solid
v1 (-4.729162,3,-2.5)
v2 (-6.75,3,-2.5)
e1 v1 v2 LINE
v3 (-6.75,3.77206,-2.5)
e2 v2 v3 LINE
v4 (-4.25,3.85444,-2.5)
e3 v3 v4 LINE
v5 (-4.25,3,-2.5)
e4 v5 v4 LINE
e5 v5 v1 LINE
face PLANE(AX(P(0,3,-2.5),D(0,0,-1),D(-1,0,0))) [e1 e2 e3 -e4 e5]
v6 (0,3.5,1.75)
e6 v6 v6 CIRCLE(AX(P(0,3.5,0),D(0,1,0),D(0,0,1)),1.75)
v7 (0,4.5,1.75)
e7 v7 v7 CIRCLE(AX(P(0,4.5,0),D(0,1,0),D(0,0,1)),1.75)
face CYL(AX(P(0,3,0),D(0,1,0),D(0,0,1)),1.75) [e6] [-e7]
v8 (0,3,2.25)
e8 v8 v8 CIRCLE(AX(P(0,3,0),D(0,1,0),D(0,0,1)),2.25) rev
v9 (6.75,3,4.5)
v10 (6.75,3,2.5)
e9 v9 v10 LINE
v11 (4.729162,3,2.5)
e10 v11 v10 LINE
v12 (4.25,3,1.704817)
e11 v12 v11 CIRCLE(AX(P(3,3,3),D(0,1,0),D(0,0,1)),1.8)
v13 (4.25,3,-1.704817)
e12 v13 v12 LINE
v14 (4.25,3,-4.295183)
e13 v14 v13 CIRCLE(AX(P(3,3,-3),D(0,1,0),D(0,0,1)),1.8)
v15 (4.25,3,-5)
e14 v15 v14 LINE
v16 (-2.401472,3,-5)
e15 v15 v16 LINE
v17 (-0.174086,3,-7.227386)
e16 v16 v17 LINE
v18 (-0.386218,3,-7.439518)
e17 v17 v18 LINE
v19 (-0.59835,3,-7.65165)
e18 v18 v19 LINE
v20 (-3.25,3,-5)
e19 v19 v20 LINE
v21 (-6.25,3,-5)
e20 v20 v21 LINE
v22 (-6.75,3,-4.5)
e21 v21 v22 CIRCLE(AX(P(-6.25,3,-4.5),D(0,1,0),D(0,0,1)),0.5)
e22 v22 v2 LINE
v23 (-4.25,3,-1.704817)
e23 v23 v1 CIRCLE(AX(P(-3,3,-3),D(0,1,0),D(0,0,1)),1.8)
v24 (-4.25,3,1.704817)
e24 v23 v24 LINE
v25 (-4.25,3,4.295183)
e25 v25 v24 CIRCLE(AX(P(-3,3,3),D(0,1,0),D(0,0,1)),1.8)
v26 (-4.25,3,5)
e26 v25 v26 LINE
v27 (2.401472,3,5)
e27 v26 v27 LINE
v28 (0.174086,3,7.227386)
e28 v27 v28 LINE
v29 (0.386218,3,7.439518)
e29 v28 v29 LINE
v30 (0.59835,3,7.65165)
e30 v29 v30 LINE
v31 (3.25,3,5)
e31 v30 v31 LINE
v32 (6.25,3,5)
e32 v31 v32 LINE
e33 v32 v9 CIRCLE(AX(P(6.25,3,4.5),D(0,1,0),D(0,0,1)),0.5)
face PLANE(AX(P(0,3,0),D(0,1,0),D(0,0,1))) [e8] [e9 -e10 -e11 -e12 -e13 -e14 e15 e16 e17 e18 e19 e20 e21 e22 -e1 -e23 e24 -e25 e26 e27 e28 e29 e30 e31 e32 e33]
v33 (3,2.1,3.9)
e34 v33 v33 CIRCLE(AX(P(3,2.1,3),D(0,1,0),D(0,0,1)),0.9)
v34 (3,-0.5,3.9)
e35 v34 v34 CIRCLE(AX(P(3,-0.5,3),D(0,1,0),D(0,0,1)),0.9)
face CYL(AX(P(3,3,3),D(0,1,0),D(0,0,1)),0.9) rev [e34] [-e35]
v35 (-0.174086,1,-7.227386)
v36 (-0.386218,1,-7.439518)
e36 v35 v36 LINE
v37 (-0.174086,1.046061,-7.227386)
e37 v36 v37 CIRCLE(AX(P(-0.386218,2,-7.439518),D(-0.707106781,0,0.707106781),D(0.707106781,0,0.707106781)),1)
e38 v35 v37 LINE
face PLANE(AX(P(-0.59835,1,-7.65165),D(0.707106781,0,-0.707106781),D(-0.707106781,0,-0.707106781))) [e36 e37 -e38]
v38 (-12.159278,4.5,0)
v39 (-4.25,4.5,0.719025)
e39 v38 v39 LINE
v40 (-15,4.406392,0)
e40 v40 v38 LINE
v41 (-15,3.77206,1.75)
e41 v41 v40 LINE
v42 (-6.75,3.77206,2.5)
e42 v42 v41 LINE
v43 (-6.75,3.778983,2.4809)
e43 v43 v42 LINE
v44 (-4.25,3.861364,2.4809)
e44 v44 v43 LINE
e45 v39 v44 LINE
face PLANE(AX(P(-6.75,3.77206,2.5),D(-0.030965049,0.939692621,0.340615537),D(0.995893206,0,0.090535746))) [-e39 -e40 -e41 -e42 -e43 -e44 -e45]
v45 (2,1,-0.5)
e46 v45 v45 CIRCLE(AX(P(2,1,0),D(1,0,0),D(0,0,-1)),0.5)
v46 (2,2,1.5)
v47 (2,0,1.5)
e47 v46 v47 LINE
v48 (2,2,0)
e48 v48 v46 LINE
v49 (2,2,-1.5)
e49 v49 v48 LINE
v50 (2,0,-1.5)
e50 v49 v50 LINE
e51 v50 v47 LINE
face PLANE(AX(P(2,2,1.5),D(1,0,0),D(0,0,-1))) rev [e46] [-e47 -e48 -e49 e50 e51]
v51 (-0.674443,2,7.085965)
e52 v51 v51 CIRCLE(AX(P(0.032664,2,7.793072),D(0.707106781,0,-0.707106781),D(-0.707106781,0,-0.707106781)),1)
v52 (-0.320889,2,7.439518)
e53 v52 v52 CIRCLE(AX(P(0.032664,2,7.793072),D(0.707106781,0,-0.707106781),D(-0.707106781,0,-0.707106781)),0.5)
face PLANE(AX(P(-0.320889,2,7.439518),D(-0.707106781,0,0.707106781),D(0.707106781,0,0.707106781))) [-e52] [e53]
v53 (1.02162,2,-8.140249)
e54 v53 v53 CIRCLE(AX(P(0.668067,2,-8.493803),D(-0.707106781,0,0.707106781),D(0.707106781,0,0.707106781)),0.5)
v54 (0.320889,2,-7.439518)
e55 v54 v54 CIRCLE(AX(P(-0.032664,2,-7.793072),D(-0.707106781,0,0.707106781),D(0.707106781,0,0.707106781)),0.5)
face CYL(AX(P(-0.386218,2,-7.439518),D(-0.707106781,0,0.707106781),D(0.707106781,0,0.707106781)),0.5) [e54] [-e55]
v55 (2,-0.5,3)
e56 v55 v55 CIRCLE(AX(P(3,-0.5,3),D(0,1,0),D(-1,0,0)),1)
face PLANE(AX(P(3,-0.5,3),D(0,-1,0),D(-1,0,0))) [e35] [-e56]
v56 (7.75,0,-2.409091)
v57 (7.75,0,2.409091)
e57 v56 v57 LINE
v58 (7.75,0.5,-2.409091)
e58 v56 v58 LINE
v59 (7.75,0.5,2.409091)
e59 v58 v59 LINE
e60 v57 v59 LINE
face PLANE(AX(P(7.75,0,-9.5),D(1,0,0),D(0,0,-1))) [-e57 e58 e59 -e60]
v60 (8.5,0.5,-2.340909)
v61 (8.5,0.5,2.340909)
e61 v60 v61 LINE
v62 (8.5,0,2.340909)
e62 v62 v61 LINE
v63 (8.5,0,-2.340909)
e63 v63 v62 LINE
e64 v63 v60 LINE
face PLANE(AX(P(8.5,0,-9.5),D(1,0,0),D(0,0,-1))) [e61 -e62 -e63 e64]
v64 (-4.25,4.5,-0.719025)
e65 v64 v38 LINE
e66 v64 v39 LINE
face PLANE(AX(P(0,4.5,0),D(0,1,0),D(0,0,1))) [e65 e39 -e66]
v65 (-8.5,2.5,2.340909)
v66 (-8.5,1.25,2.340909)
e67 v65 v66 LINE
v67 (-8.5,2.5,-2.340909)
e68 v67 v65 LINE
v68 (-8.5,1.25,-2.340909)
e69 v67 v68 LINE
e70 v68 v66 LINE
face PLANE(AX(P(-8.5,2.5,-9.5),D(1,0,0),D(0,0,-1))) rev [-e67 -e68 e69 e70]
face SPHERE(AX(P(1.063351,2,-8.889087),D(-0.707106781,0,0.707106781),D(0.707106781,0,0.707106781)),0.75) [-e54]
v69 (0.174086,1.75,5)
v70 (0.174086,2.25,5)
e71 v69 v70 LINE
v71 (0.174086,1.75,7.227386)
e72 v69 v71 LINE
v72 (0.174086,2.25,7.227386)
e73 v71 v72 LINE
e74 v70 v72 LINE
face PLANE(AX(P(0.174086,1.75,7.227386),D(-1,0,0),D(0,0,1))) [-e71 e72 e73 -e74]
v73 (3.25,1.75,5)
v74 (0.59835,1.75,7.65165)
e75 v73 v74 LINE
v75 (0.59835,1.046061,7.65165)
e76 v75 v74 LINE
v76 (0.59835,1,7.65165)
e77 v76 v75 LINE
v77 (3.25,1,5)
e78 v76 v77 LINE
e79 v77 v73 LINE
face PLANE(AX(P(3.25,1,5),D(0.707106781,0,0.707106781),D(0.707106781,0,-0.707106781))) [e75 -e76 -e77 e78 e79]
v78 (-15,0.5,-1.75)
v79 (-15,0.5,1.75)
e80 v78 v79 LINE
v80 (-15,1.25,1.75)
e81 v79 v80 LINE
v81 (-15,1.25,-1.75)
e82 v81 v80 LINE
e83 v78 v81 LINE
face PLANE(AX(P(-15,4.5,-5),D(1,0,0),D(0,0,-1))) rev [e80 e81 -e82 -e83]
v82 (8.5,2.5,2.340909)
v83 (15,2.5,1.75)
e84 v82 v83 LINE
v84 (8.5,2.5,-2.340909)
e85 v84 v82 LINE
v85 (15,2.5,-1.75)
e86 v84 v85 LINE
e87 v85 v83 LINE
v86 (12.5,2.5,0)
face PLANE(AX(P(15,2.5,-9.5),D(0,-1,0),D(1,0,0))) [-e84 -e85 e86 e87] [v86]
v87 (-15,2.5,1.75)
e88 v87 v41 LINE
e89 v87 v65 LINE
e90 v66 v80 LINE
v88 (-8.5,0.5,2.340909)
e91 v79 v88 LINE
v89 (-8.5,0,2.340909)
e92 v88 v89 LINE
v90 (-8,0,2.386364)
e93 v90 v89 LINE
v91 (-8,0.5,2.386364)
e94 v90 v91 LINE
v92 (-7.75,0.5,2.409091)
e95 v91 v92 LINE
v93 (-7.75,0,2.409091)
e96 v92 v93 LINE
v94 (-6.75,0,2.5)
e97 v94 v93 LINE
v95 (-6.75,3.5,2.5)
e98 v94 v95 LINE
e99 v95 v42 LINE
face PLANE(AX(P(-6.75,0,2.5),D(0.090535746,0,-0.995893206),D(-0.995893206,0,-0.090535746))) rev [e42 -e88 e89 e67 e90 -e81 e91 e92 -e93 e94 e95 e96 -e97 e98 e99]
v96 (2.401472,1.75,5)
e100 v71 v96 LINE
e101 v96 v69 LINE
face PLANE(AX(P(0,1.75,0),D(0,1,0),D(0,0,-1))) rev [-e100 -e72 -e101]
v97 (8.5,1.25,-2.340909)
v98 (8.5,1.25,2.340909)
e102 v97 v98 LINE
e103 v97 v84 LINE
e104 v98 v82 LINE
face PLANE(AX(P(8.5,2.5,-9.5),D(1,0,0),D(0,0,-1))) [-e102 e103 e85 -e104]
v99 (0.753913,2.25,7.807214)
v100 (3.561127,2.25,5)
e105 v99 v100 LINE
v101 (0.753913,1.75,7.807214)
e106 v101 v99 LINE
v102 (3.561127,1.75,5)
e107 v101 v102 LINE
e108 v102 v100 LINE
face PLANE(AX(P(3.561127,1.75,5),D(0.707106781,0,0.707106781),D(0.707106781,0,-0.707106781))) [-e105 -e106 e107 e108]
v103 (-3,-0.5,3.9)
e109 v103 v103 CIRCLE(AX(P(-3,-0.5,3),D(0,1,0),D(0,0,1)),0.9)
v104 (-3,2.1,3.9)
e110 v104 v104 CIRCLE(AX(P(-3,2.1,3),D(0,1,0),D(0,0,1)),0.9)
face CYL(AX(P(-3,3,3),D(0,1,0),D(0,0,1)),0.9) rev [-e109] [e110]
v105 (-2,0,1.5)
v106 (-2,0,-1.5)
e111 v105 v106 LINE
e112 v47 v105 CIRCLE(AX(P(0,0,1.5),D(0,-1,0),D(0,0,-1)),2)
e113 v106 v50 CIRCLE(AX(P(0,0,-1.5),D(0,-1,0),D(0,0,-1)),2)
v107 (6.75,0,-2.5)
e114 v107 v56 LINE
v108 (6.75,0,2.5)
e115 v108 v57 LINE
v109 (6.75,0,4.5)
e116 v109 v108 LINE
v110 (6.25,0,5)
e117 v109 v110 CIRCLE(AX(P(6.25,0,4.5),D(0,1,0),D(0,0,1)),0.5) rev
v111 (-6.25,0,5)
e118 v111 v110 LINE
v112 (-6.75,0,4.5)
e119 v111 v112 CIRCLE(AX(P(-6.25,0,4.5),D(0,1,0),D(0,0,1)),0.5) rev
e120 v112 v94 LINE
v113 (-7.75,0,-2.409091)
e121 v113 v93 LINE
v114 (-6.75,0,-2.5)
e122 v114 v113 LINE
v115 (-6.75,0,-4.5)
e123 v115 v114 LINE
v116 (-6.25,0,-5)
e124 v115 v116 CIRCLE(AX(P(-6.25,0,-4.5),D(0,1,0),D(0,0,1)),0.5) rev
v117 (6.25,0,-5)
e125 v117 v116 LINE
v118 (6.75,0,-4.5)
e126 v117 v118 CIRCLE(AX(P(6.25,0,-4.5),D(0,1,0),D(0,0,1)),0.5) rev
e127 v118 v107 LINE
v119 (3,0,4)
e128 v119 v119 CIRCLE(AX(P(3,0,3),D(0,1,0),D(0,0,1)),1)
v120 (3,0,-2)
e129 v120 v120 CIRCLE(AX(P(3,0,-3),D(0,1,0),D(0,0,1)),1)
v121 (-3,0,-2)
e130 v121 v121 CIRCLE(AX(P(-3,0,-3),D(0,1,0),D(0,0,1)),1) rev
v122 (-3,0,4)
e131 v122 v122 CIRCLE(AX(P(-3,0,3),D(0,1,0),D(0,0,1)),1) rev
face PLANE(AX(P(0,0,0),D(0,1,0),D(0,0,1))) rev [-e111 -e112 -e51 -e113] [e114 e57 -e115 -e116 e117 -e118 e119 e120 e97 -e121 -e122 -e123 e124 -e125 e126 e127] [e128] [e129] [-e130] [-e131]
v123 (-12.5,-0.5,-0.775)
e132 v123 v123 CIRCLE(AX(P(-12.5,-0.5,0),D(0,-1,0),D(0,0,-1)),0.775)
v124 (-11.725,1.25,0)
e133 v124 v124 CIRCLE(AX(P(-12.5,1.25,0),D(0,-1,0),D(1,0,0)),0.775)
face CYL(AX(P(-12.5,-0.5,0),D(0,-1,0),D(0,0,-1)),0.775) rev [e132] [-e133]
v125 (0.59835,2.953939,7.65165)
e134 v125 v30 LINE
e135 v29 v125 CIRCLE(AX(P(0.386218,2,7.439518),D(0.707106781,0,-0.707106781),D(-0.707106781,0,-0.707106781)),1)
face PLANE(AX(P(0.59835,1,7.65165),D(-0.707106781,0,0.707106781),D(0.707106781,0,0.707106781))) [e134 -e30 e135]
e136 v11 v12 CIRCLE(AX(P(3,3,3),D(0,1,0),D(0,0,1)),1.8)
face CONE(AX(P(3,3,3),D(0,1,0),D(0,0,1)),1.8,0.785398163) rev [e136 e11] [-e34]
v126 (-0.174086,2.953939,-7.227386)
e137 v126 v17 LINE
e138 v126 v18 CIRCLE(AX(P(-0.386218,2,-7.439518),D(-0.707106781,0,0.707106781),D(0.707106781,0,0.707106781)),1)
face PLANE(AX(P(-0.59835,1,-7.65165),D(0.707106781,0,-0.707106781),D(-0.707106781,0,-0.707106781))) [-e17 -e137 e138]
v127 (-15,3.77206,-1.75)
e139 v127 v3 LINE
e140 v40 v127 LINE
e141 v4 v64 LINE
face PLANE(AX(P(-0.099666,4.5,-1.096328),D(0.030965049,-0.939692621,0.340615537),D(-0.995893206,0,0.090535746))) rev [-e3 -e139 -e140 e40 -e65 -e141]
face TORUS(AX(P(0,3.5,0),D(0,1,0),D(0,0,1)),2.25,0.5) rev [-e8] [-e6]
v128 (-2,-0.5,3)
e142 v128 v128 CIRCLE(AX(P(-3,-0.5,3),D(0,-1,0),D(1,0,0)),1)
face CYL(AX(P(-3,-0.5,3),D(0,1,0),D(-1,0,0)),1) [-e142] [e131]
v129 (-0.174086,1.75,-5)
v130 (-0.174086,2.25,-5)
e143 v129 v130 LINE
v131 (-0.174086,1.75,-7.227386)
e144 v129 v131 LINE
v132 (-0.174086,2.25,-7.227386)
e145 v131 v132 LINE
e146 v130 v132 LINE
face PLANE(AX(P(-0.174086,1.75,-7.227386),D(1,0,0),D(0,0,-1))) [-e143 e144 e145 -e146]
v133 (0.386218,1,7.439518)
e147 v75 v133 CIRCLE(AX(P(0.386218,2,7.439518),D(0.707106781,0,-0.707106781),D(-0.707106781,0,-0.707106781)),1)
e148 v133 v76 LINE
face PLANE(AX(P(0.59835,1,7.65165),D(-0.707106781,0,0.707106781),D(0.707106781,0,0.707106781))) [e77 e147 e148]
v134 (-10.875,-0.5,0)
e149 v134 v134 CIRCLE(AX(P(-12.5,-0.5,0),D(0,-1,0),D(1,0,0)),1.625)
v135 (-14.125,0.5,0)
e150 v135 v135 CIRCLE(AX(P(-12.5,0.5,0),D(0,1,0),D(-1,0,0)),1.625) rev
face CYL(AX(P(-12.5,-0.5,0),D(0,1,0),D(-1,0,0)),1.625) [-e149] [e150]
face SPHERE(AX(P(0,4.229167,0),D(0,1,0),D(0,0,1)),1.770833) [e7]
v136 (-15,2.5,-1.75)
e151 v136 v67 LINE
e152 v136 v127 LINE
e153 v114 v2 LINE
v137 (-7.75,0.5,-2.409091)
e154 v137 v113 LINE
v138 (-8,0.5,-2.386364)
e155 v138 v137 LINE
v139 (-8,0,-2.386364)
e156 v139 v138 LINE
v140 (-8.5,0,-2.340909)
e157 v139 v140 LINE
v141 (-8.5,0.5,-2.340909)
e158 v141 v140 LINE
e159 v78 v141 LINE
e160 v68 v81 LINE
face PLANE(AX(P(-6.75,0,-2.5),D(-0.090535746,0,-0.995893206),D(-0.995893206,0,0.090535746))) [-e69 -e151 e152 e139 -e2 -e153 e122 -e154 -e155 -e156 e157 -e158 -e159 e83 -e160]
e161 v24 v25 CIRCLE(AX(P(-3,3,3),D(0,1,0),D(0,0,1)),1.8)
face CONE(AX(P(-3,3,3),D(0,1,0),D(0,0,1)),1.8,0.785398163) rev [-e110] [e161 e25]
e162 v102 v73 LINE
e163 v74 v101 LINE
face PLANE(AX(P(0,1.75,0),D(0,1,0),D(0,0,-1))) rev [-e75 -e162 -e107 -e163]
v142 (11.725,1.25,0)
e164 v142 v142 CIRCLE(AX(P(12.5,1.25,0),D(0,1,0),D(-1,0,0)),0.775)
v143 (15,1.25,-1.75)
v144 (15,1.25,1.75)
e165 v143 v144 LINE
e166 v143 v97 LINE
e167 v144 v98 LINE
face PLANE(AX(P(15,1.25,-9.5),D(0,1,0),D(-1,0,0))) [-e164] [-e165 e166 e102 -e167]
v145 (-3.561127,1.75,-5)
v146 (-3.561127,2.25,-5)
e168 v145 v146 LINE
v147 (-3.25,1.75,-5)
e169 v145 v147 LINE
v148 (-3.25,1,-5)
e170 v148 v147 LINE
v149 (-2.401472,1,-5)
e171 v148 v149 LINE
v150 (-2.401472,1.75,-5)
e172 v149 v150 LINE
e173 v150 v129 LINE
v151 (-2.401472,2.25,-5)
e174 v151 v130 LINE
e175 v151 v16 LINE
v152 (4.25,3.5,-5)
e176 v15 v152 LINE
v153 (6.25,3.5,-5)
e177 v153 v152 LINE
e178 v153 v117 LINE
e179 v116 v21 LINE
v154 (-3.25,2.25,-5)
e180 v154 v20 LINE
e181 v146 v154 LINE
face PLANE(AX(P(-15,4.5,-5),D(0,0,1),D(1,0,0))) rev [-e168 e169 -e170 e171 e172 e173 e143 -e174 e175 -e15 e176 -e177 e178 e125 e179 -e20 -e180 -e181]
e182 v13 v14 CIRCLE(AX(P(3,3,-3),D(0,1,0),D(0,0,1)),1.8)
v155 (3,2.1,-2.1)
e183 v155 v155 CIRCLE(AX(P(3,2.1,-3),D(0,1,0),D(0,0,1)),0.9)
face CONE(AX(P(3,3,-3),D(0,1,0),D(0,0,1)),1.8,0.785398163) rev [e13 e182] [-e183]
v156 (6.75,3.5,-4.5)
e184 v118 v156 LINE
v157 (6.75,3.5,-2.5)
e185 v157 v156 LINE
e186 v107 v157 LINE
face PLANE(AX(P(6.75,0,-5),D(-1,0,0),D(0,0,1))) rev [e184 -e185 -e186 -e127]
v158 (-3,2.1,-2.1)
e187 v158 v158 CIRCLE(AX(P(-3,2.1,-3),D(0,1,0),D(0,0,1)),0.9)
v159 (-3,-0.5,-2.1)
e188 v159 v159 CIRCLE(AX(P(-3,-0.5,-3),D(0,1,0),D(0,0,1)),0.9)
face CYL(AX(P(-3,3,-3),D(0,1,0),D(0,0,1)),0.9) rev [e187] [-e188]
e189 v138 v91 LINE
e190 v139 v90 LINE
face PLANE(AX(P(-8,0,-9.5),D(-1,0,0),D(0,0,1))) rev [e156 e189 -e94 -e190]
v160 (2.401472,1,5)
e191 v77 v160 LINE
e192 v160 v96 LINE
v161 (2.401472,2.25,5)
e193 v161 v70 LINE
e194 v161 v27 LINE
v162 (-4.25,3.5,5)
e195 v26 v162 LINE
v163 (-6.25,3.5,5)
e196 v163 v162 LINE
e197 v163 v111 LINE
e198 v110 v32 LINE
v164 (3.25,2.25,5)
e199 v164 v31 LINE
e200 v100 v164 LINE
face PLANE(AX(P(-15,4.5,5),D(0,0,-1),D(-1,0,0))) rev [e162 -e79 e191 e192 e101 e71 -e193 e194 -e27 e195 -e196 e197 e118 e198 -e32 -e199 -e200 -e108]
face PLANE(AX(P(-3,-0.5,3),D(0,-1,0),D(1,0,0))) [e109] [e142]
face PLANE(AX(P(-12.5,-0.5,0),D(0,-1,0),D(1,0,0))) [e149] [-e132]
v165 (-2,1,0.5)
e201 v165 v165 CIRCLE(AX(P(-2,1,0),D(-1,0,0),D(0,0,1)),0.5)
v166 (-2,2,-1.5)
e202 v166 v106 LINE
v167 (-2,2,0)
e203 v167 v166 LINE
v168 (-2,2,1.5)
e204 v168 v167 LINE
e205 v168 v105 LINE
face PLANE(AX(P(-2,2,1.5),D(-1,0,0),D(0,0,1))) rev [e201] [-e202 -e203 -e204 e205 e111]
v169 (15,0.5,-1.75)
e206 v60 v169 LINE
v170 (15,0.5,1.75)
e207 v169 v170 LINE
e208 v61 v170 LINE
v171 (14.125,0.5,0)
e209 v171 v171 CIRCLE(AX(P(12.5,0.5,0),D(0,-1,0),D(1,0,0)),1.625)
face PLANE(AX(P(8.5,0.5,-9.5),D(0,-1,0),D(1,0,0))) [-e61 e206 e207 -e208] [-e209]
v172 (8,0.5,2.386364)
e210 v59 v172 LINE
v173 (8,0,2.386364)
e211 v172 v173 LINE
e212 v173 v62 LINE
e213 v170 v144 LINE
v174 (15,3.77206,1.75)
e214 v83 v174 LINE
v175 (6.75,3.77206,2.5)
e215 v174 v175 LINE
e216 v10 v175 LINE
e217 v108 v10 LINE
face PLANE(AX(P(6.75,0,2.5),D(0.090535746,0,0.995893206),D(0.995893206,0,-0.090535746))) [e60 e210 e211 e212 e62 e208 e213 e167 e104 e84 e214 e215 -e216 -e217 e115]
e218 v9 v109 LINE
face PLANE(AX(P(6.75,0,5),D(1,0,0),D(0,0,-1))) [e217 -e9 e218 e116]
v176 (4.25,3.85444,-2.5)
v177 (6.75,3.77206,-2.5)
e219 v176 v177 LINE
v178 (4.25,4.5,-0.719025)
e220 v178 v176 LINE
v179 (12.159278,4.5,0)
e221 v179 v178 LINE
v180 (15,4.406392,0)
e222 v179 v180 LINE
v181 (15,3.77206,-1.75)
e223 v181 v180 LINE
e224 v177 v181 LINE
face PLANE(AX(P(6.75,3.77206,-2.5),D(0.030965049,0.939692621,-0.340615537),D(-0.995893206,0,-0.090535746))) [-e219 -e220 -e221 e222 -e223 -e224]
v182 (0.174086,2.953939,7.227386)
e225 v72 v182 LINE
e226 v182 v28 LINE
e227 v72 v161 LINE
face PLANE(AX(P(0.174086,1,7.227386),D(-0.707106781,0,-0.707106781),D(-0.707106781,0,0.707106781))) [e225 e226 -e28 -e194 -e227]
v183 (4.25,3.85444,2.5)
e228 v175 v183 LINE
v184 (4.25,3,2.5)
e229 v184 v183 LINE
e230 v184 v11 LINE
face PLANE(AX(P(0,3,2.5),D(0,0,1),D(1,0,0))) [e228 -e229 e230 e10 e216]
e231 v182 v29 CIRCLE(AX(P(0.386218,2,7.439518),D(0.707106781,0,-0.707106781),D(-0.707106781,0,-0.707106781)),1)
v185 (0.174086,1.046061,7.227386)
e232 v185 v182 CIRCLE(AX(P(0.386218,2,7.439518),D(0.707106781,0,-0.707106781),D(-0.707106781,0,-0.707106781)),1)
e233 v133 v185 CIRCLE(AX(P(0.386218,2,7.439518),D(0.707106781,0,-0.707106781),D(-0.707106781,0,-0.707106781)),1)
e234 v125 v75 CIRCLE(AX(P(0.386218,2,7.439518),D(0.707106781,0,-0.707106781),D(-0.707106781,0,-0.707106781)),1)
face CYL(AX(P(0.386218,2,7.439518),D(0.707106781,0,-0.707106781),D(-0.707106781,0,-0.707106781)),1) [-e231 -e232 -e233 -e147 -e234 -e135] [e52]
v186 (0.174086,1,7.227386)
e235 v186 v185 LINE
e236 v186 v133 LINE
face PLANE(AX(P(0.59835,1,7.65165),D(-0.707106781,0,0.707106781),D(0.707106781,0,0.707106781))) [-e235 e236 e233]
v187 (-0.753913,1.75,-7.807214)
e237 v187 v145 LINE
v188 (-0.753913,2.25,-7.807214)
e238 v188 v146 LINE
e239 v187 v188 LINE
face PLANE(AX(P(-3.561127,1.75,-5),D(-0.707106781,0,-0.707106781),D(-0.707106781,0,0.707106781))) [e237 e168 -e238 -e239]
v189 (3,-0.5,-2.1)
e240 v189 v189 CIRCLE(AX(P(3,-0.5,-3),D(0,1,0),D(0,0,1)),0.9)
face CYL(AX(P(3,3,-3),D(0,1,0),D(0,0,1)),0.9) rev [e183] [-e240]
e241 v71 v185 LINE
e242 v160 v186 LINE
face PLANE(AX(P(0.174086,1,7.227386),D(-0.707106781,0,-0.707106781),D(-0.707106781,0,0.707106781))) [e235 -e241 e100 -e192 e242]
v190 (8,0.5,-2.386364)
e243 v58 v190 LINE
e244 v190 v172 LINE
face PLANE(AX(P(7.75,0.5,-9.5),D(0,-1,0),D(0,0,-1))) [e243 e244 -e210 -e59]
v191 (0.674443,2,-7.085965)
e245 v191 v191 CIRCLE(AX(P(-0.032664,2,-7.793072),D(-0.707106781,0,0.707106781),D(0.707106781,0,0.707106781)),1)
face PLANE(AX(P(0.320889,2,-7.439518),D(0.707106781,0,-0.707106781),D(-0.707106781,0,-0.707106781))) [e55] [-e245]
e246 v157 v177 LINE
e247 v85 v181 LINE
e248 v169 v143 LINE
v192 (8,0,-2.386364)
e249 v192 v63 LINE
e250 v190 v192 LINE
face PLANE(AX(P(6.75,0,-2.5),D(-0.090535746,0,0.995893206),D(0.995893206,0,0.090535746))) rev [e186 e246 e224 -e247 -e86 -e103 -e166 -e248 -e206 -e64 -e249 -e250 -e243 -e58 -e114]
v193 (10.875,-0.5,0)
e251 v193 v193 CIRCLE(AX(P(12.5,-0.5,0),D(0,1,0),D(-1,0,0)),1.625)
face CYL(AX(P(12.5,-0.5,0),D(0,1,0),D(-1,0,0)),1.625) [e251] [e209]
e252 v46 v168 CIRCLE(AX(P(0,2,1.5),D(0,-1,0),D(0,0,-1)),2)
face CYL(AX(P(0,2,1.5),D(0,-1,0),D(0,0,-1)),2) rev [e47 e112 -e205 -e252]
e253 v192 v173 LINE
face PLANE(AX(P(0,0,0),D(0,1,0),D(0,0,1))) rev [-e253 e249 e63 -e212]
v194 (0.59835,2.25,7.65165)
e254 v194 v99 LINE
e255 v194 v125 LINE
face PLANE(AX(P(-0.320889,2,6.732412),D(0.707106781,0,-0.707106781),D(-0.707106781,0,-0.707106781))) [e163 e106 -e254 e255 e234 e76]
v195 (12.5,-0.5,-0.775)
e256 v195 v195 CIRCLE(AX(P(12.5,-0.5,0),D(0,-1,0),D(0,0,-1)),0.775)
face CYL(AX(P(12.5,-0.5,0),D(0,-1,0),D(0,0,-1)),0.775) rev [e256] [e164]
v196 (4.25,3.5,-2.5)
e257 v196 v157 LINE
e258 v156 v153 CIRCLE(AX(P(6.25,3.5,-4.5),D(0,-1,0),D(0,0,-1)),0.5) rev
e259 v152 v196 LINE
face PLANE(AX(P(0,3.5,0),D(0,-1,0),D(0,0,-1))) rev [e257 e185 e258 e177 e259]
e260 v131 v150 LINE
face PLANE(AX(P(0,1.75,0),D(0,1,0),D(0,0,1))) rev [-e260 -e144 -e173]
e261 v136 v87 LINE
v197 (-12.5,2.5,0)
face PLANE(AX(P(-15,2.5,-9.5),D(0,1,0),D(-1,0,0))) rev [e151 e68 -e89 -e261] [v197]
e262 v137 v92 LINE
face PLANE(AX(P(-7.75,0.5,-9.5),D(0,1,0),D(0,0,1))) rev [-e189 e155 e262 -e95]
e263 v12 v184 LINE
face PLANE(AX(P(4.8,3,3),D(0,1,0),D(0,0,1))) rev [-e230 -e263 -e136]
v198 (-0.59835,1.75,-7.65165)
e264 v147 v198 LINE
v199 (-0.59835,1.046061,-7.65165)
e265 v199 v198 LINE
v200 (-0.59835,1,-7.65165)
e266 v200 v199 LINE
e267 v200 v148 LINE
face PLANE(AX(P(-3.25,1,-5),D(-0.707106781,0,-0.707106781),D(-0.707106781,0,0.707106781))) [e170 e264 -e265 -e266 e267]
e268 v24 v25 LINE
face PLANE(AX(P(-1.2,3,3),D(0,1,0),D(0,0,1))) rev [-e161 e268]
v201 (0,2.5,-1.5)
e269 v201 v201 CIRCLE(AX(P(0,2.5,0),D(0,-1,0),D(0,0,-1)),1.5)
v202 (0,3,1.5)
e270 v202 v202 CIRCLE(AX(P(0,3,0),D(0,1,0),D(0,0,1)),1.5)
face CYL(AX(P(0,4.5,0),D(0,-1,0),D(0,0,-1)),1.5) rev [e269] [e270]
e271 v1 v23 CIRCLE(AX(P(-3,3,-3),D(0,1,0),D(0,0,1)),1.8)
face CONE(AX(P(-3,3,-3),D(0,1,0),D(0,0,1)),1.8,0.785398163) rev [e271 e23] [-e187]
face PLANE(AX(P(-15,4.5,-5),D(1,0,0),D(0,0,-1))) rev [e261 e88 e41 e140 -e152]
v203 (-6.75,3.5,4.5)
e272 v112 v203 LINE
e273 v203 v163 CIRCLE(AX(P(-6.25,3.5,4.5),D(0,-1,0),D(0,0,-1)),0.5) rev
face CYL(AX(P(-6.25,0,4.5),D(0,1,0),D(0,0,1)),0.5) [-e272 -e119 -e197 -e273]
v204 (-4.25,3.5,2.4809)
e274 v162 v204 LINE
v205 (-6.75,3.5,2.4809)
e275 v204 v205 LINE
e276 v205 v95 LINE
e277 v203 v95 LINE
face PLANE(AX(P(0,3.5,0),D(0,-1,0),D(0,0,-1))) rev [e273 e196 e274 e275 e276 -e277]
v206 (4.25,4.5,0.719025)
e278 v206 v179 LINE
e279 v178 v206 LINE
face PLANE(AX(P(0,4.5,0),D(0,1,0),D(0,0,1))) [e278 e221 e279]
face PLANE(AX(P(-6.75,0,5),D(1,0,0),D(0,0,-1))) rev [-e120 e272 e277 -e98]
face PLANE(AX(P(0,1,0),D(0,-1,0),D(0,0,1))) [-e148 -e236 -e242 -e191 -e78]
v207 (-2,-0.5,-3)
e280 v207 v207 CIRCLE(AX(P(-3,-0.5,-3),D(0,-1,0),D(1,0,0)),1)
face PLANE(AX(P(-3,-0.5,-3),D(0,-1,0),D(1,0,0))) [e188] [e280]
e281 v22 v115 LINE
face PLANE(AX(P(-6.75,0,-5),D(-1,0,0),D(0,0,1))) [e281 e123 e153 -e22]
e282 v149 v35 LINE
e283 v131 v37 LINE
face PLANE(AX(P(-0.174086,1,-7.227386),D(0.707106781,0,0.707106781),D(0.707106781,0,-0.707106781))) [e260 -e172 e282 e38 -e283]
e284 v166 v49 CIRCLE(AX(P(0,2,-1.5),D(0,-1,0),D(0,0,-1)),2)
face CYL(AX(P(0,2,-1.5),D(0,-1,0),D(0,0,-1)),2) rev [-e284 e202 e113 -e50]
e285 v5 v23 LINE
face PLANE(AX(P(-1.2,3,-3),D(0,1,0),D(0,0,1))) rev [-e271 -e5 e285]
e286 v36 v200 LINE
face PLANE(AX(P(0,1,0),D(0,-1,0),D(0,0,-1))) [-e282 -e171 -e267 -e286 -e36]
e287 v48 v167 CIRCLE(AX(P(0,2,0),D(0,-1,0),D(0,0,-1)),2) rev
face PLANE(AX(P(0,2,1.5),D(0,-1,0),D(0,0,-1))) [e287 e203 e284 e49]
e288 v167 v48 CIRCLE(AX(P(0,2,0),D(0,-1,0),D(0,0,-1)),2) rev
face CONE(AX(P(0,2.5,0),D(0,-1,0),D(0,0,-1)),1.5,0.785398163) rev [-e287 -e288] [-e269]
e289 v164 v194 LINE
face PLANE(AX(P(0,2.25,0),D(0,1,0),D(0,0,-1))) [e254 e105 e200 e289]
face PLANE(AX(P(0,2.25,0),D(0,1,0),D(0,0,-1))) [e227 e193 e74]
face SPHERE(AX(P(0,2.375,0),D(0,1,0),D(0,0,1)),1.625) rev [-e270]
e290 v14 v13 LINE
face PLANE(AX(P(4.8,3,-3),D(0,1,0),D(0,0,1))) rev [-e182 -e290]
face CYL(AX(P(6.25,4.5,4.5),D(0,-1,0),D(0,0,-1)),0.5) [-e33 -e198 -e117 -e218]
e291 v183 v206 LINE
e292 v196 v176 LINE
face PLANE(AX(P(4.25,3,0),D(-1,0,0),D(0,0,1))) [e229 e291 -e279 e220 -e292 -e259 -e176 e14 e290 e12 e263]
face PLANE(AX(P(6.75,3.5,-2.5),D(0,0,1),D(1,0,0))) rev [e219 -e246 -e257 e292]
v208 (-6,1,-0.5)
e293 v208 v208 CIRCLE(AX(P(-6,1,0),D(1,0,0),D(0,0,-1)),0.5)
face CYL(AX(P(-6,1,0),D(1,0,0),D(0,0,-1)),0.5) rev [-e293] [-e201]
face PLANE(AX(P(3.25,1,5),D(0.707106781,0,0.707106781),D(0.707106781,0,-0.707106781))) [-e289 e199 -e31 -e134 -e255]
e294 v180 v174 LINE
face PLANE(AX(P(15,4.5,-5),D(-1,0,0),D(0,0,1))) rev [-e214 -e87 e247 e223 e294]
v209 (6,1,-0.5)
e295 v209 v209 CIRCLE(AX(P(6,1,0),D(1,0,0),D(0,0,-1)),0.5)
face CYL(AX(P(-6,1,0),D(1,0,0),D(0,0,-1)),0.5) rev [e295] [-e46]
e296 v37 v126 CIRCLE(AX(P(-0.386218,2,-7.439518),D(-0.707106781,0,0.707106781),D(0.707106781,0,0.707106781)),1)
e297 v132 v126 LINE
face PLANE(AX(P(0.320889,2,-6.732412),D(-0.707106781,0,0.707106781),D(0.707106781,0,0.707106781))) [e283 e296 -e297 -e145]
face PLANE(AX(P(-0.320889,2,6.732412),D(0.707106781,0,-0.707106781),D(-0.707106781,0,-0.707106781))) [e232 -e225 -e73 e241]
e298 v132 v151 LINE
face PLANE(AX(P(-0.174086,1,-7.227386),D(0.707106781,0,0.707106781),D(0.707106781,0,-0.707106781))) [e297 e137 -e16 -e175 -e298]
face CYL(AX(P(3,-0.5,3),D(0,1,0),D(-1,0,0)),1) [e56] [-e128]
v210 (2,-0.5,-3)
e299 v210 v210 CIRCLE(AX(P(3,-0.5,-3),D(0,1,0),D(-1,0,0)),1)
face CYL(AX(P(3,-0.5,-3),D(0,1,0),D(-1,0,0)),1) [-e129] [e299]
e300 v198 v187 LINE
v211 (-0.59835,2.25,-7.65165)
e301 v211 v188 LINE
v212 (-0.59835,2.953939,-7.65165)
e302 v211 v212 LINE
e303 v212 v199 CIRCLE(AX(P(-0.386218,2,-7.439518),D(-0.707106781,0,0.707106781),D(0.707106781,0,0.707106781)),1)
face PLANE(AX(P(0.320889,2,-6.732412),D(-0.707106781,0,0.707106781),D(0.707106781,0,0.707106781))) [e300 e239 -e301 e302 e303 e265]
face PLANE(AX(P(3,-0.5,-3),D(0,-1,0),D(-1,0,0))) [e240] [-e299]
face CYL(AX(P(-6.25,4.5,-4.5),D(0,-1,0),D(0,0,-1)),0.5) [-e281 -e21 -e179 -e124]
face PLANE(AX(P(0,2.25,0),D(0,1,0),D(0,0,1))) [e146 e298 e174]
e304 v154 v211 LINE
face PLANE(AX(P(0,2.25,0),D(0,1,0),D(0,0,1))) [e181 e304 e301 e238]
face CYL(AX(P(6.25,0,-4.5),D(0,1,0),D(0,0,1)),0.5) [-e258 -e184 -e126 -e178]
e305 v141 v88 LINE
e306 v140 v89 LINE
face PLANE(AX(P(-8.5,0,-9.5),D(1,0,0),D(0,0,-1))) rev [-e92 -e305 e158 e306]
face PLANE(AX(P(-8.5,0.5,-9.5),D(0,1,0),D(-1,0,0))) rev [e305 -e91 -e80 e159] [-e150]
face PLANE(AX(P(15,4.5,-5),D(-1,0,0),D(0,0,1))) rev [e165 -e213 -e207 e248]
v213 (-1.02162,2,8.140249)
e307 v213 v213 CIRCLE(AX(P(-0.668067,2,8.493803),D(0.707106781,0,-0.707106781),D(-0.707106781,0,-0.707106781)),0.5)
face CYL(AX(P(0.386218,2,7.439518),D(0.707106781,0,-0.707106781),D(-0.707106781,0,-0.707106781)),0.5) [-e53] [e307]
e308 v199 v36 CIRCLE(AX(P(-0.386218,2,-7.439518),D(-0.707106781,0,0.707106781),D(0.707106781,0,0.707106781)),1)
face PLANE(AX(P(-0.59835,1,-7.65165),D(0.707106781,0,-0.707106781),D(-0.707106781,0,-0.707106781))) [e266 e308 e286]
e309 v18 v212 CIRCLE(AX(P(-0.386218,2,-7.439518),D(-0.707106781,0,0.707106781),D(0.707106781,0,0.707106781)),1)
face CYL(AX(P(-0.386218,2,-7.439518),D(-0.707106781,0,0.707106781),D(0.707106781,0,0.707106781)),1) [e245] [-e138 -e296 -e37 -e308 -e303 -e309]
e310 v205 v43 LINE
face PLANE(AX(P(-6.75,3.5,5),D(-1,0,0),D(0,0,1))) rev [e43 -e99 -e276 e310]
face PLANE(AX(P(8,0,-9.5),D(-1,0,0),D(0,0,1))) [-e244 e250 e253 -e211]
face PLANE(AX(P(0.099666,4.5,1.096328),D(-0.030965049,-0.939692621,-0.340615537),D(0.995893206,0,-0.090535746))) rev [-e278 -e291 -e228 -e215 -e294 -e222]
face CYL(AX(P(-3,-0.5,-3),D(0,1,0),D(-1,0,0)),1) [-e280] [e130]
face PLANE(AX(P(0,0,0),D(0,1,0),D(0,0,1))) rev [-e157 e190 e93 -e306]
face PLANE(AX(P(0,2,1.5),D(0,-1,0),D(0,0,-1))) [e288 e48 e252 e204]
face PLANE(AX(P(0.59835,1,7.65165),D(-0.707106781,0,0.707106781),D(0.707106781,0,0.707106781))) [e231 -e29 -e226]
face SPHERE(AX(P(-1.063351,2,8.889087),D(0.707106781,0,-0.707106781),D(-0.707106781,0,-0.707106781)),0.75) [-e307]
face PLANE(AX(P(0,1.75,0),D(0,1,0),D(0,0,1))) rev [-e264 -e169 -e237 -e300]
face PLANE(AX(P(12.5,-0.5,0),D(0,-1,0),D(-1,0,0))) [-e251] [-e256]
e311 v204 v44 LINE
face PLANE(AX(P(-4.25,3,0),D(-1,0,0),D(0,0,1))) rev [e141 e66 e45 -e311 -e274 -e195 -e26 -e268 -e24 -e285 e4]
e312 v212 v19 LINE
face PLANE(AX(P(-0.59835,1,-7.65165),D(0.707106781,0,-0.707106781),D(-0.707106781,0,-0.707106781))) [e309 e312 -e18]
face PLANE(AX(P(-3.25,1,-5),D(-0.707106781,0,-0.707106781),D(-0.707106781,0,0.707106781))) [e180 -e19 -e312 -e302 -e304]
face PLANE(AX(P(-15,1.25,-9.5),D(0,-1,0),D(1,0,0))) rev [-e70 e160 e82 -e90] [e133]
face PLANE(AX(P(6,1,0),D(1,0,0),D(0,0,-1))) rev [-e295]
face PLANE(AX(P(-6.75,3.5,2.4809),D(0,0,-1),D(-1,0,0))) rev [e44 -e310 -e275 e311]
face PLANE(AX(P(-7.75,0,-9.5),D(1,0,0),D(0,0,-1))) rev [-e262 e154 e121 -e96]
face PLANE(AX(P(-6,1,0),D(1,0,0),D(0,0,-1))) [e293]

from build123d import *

# Parameters (mm, degrees)
SKETCH2_W                                    = 30
SKETCH2_H                                    = 10
SKETCH2_R                                    = 1.5
BOSS_EXTRUDE1_DEPTH                          = 4.5
CUT_EXTRUDE1_START                           = -1.5
SKETCH3_W                                    = 2.5
SKETCH3_H                                    = 2.5
SKETCH3_R                                    = 1.75
SKETCH3_R_2                                  = 1.5
CUT_EXTRUDE1_DEPTH                           = 1.5
CUT_EXTRUDE2_DEPTH                           = 17.439282223
SKETCH5_W                                    = 2.5
SKETCH5_H                                    = 2.519100352
SKETCH5_H_2                                  = 2.5
CUT_EXTRUDE3_DEPTH                           = 1
SKETCH6_W                                    = 0.25
SKETCH6_H                                    = 0.5
SKETCH6_W_2                                  = 6.5
SKETCH6_H_2                                  = 1.25
CUT_EXTRUDE4_DEPTH                           = 9.5
SKETCH7_R                                    = 1.625
SKETCH7_R_2                                  = 1
SKETCH7_R_3                                  = 0.5
BOSS_EXTRUDE2_DEPTH                          = 1
CHAMFER1_SIZE                                = 0.727940469
CHAMFER1_SIZE_2                              = 2
CSK_FOR_M1_6_COUNTERSUNK_FLAT_HEAD_S_2_COUNT = 2
CSK_FOR_M1_6_COUNTERSUNK_FLAT_HEAD_S_2_PITCH = 6
BOSS_EXTRUDE3_DEPTH                          = 2
BOSS_EXTRUDE4_START                          = -0.75
BOSS_EXTRUDE4_DEPTH                          = 0.5
SKETCH34_R                                   = 1.75
BOSS_EXTRUDE5_DEPTH                          = 1.5
CIRPATTERN1_COUNT                            = 2
CUT_EXTRUDE5_DEPTH                           = 2
SKETCH37_R                                   = 0.5
CUT_EXTRUDE6_DEPTH                           = 6
FILLET1_R                                    = 0.5
CHAMFER2_SIZE                                = 0.5
FILLET2_R                                    = 0.5


# Read off the part's stored shape, not the designer's step: Dome1, Dome3
# Some blends are built 0.0001 mm under size
with BuildPart() as part:
    # Sketch2 → Boss-Extrude1 (new body)
    with BuildSketch(Plane(origin=(0, 0, 0), x_dir=(1, 0, 0), z_dir=(0, 1, 0))):
        Rectangle(SKETCH2_W, SKETCH2_H)
        with Locations(Location((0, 0, 0), (0, 0, 270))):
            Circle(SKETCH2_R, mode=Mode.SUBTRACT)
    extrude(amount=BOSS_EXTRUDE1_DEPTH)

    # Sketch3 → Cut-Extrude1 (cut)
    # profile 1 of 5: a face of its own
    with BuildSketch(Plane(origin=(0, 4.5, 0), x_dir=(1, 0, 0), z_dir=(0, 1, 0)).offset(CUT_EXTRUDE1_START)):
        with Locations((-5.5, 3.75)):
            Rectangle(SKETCH3_W, SKETCH3_H)
    # profile 2 of 5: a face of its own
    with BuildSketch(Plane(origin=(0, 4.5, 0), x_dir=(1, 0, 0), z_dir=(0, 1, 0)).offset(CUT_EXTRUDE1_START)):
        Polygon((4.25, 5), (-4.25, 5), (-4.25, 2.5), (-4.25, -5), (4.25, -5), (4.25, -2.5), align=None)
        with Locations(Location((0, 0, 0), (0, 0, 270))):
            Circle(SKETCH3_R, mode=Mode.SUBTRACT)
    # profile 3 of 5: a face of its own
    with BuildSketch(Plane(origin=(0, 4.5, 0), x_dir=(1, 0, 0), z_dir=(0, 1, 0)).offset(CUT_EXTRUDE1_START)):
        with Locations((5.5, -3.75)):
            Rectangle(SKETCH3_W, SKETCH3_H)
    # profile 4 of 5: a face of its own
    with BuildSketch(Plane(origin=(0, 4.5, 0), x_dir=(1, 0, 0), z_dir=(0, 1, 0)).offset(CUT_EXTRUDE1_START)):
        with Locations(Location((0, 0, 0), (0, 0, 270))):
            Circle(SKETCH3_R_2)
    # profile 5 of 5: a face of its own
    with BuildSketch(Plane(origin=(0, 4.5, 0), x_dir=(1, 0, 0), z_dir=(0, 1, 0)).offset(CUT_EXTRUDE1_START)):
        with Locations(Location((0, 0, 0), (0, 0, 270))):
            Circle(SKETCH3_R_2)
    extrude(amount=CUT_EXTRUDE1_DEPTH, mode=Mode.SUBTRACT)

    # Sketch4 → Cut-Extrude2 (cut, through all)
    with BuildSketch(Plane(origin=(0, 4.5, 0), x_dir=(1, 0, 0), z_dir=(0, 1, 0))):
        Polygon((-6.75, 5), (-6.75, 2.5), (-15, 1.75), (-15, 5), align=None)
        Polygon((6.75, -5), (6.75, -2.5), (15, -1.75), (15, -5), align=None)
        Polygon((15, 5), (6.75, 5), (6.75, 2.5), (15, 1.75), align=None)
        Polygon((-15, -1.75), (-15, -5), (-6.75, -5), (-6.75, -2.5), align=None)
    extrude(amount=-CUT_EXTRUDE2_DEPTH, mode=Mode.SUBTRACT)

    # Sketch5 → Cut-Extrude3 (cut)
    with BuildSketch(Plane(origin=(0, 4.5, 0), x_dir=(1, 0, 0), z_dir=(0, 1, 0))):
        with Locations((-5.5, -3.740449824)):
            Rectangle(SKETCH5_W, SKETCH5_H)
        with Locations((5.5, 3.75)):
            Rectangle(SKETCH5_W, SKETCH5_H_2)
    extrude(amount=-CUT_EXTRUDE3_DEPTH, mode=Mode.SUBTRACT)

    # Sketch6 → Cut-Extrude4 (cut, symmetric)
    with BuildSketch(Plane.XY):
        with Locations((-7.875, 0.25)):
            Rectangle(SKETCH6_W, SKETCH6_H)
        with Locations((-11.75, 0.25)):
            Rectangle(SKETCH6_W_2, SKETCH6_H)
        with Locations((-11.75, 1.875)):
            Rectangle(SKETCH6_W_2, SKETCH6_H_2)
    cut_extrude4 = extrude(amount=CUT_EXTRUDE4_DEPTH, both=True, mode=Mode.SUBTRACT)

    # Sketch7 → Boss-Extrude2 (add)
    # profile 1 of 3: a face of its own
    with BuildSketch(Plane.XZ.offset(-0.5)):
        with Locations(Location((-12.5, 0, 0), (0, 0, 180))):
            Circle(SKETCH7_R)
    # profile 2 of 3: a face of its own
    with BuildSketch(Plane.XZ.offset(-0.5)):
        with Locations(Location((-3, 3, 0), (0, 0, 90))):
            Circle(SKETCH7_R_2)
        with Locations(Location((-3, 3, 0), (0, 0, 90))):
            Circle(SKETCH7_R_3, mode=Mode.SUBTRACT)
    # profile 3 of 3: a face of its own
    with BuildSketch(Plane.XZ.offset(-0.5)):
        with Locations(Location((-3, -3, 0), (0, 0, 90))):
            Circle(SKETCH7_R_2)
        with Locations(Location((-3, -3, 0), (0, 0, 90))):
            Circle(SKETCH7_R_3, mode=Mode.SUBTRACT)
    boss_extrude2 = extrude(amount=BOSS_EXTRUDE2_DEPTH)

    # Chamfer1
    # the kernel refuses this chamfer: 2, 0.727940469 mm, written as the material it takes off along each edge
    with BuildSketch(Plane(origin=(-1.582918179, 4.5, 2.969734711), x_dir=(-0.008966741974113306, -0.9950833631817487, 0.0986341617152475), z_dir=(-0.9958932064677041, 0, -0.09053574604251752))) as chamfer1_piece_1_section:
        Polygon((CHAMFER1_SIZE * 0.995083362543, -CHAMFER1_SIZE * 0.0990409021884), (-CHAMFER1_SIZE_2 * 0.099040902252, -CHAMFER1_SIZE_2 * 0.995083363182), (0, 0), align=None)
    chamfer1_piece_1 = extrude(amount=18.660799693, mode=Mode.PRIVATE)
    chamfer1_piece_1 = split(chamfer1_piece_1, bisect_by=Plane(origin=(-4.25, 4.272837188, 1.854201231), z_dir=(-1, 0, 0)), keep=Keep.TOP, mode=Mode.PRIVATE)
    add(chamfer1_piece_1, mode=Mode.SUBTRACT)
    with BuildSketch(Plane(origin=(-1.582918179, 4.5, -2.969734711), x_dir=(-0.00896674197411342, -0.9950833631817487, -0.09863416171524762), z_dir=(-0.9958932064677039, 0, 0.09053574604251854))) as chamfer1_piece_2_section:
        Polygon((CHAMFER1_SIZE * 0.995083362543, CHAMFER1_SIZE * 0.0990409021884), (-CHAMFER1_SIZE_2 * 0.099040902252, CHAMFER1_SIZE_2 * 0.995083363182), (0, 0), align=None)
    chamfer1_piece_2 = extrude(amount=18.660799693, mode=Mode.PRIVATE)
    chamfer1_piece_2 = split(chamfer1_piece_2, bisect_by=Plane(origin=(-4.25, 4.260155849, -1.543047627), z_dir=(-1, 0, 0)), keep=Keep.TOP, mode=Mode.PRIVATE)
    add(chamfer1_piece_2, mode=Mode.SUBTRACT)
    with BuildSketch(Plane(origin=(1.582918179, 4.5, 2.969734711), x_dir=(0.008966741974113313, -0.9950833631817487, 0.0986341617152475), z_dir=(0.9958932064677041, 0, -0.09053574604251757))) as chamfer1_piece_3_section:
        Polygon((CHAMFER1_SIZE * 0.995083362543, CHAMFER1_SIZE * 0.0990409021884), (-CHAMFER1_SIZE_2 * 0.099040902252, CHAMFER1_SIZE_2 * 0.995083363182), (0, 0), align=None)
    chamfer1_piece_3 = extrude(amount=18.660799693, mode=Mode.PRIVATE)
    chamfer1_piece_3 = split(chamfer1_piece_3, bisect_by=Plane(origin=(4.25, 4.260155849, 1.543047627), z_dir=(1, 0, 0)), keep=Keep.TOP, mode=Mode.PRIVATE)
    add(chamfer1_piece_3, mode=Mode.SUBTRACT)
    with BuildSketch(Plane(origin=(1.582918179, 4.5, -2.969734711), x_dir=(0.00896674197411333, -0.9950833631817487, -0.09863416171524761), z_dir=(0.995893206467704, 0, 0.09053574604251764))) as chamfer1_piece_4_section:
        Polygon((CHAMFER1_SIZE * 0.995083362543, -CHAMFER1_SIZE * 0.0990409021884), (-CHAMFER1_SIZE_2 * 0.099040902252, -CHAMFER1_SIZE_2 * 0.995083363182), (0, 0), align=None)
    chamfer1_piece_4 = extrude(amount=18.660799693, mode=Mode.PRIVATE)
    chamfer1_piece_4 = split(chamfer1_piece_4, bisect_by=Plane(origin=(4.25, 4.260155849, -1.543047627), z_dir=(1, 0, 0)), keep=Keep.TOP, mode=Mode.PRIVATE)
    add(chamfer1_piece_4, mode=Mode.SUBTRACT)

    # Sketch9 → Ø1.55 (1.55) Diameter Hole2 (revolve, cut)
    with BuildSketch(Plane(origin=(-12.5, -0.5, 0), x_dir=(0, 0, -1), z_dir=(1, 0, 0))):
        Polygon((0, 0), (0, 3), (0.775, 2.53433302), (0.775, 0), align=None)
    f_1_55_1_55_diameter_hole2 = revolve(axis=Axis((-12.5, -6.85, 0), (0, 1, 0)), mode=Mode.SUBTRACT)

    # Sketch30 → CSK for M1.6 Countersunk Flat Head Screw9 (revolve, cut)
    with BuildSketch(Plane(origin=(-3, 3, 3), x_dir=(0, 0, 1), z_dir=(1, 0, 0))):
        Polygon((0, 0), (0, 3.5), (0.9, 3.5), (0.9, 0.9), (1.8, 0), align=None)
    csk_for_m1_6_countersunk_flat_head_screw = revolve(axis=Axis((-3, 9.35, 3), (0, -1, 0)), mode=Mode.SUBTRACT)

    # CSK for M1.6 Countersunk Flat Head S 2: CSK for M1.6 Countersunk Flat Head Screw9 ×2
    with Locations(*[(0, 0, -i * CSK_FOR_M1_6_COUNTERSUNK_FLAT_HEAD_S_2_PITCH) for i in range(1, CSK_FOR_M1_6_COUNTERSUNK_FLAT_HEAD_S_2_COUNT)]):
        add(csk_for_m1_6_countersunk_flat_head_screw, mode=Mode.SUBTRACT)

    # Sketch31 → Boss-Extrude3 (add)
    with BuildSketch(Plane(origin=(0, 3, 0), x_dir=(1, 0, 0), z_dir=(0, 1, 0))):
        Polygon((-3.25, 5), (-0.598349571, 7.651650429), (-0.174085502, 7.227386361), (-2.401471863, 5), align=None)
    boss_extrude3 = extrude(amount=-BOSS_EXTRUDE3_DEPTH)

    # Sketch32 → Boss-Extrude4 (add)
    with BuildSketch(Plane(origin=(0, 3, 0), x_dir=(1, 0, 0), z_dir=(0, 1, 0)).offset(BOSS_EXTRUDE4_START)):
        Polygon((-0.174085502, 7.227386361), (-0.174085502, 5), (-3.561126984, 5), (-0.753913062, 7.807213921), align=None)
    boss_extrude4 = extrude(amount=-BOSS_EXTRUDE4_DEPTH)

    # Sketch33 → Revolve1 (revolve)
    with BuildSketch(Plane(origin=(0, 2, 0), x_dir=(1, 0, 0), z_dir=(0, 1, 0))):
        with BuildLine():
            Line((-0.386217536, 7.439518395), (1.593681451, 9.419417382))
            ThreePointArc((1.593681451, 9.419417382), (1.748004562, 8.582901079), (1.021620048, 8.140249198))
            Line((1.021620048, 8.140249198), (0.320889245, 7.439518395))
            Line((0.320889245, 7.439518395), (0.674442636, 7.085965005))
            Line((0.674442636, 7.085965005), (0.320889245, 6.732411614))
            Line((0.320889245, 6.732411614), (-0.386217536, 7.439518395))
        make_face()
    revolve1 = revolve(axis=Axis((-0.386217536, 2, -7.439518395), (0.7071067811865476, 0, -0.7071067811865476)))

    # Sketch34 → Boss-Extrude5 (add)
    with BuildSketch(Plane(origin=(0, 3, 0), x_dir=(1, 0, 0), z_dir=(0, 1, 0))):
        with Locations(Location((0, 0, 0), (0, 0, 270))):
            Circle(SKETCH34_R)
    extrude(amount=BOSS_EXTRUDE5_DEPTH)

    # Dome1 outline → Dome1 (revolve)
    with BuildSketch(Plane.XY):
        with BuildLine():
            Line((0, 4.5), (1.75, 4.499999998))
            ThreePointArc((1.75, 4.499999998), (1.152443058, 5.573683566), (0, 6))
            Line((0, 6), (0, 4.5))
        make_face()
    revolve(axis=Axis((0, 0, 0), (0, 1, 0)))

    # Mirror1: Cut-Extrude4, Boss-Extrude2, Ø1.55 (1.55) Diameter Hole2, CSK for M1.6 Countersunk Flat Head Screw9 across plane
    add(cut_extrude4.mirror(Plane(origin=(0, 0, 0), x_dir=(0, 0, 1), z_dir=(1, 0, 0))), mode=Mode.SUBTRACT)
    add(boss_extrude2.mirror(Plane(origin=(0, 0, 0), x_dir=(0, 0, 1), z_dir=(1, 0, 0))))
    add(f_1_55_1_55_diameter_hole2.mirror(Plane(origin=(0, 0, 0), x_dir=(0, 0, 1), z_dir=(1, 0, 0))), mode=Mode.SUBTRACT)
    add(csk_for_m1_6_countersunk_flat_head_screw.mirror(Plane(origin=(0, 0, 0), x_dir=(0, 0, 1), z_dir=(1, 0, 0))), mode=Mode.SUBTRACT)

    # Mirror1 copy 1 sketch → Mirror1 copy 1 (revolve, cut)
    with BuildSketch(Plane(origin=(3, 3, -3), x_dir=(0, 0, 1), z_dir=(-1, 0, 0))):
        Polygon((0, 0), (0, -3.5), (0.9, -3.5), (0.9, -0.9), (1.8, 0), align=None)
    revolve(axis=Axis((3, 9.35, -3), (0, 1, 0)), mode=Mode.SUBTRACT)

    # CirPattern1: Boss-Extrude3, Boss-Extrude4, Revolve1 ×2 about axis
    cirpattern1_axis = Axis((0, 0, 0), (0, 1, 0))
    add([boss_extrude3.rotate(cirpattern1_axis, i * 360 / CIRPATTERN1_COUNT) for i in range(1, CIRPATTERN1_COUNT)])
    add([boss_extrude4.rotate(cirpattern1_axis, i * 360 / CIRPATTERN1_COUNT) for i in range(1, CIRPATTERN1_COUNT)])
    add([revolve1.rotate(cirpattern1_axis, i * 360 / CIRPATTERN1_COUNT) for i in range(1, CIRPATTERN1_COUNT)])

    # Dome3 outline → Dome3 (revolve, cut)
    with BuildSketch(Plane.XY):
        with BuildLine():
            Line((0, 3), (1.500000001, 2.999999998))
            ThreePointArc((1.500000001, 2.999999998), (0.90138782, 3.727081728), (0, 4))
            Line((0, 4), (0, 3))
        make_face()
    revolve(axis=Axis((0, 0, 0), (0, 1, 0)), mode=Mode.SUBTRACT)

    # Sketch36 → Cut-Extrude5 (cut)
    with BuildSketch(Plane.XZ):
        with BuildLine():
            Line((2, 1.5), (2, -1.5))
            ThreePointArc((2, -1.5), (0, -3.5), (-2, -1.5))
            Line((-2, -1.5), (-2, 1.5))
            ThreePointArc((-2, 1.5), (0, 3.5), (2, 1.5))
        make_face()
    extrude(amount=-CUT_EXTRUDE5_DEPTH, mode=Mode.SUBTRACT)

    # Sketch37 → Cut-Extrude6 (cut, symmetric)
    with BuildSketch(Plane(origin=(0, 0, 0), x_dir=(0, 0, -1), z_dir=(1, 0, 0))):
        with Locations((0, 1)):
            Circle(SKETCH37_R)
    extrude(amount=CUT_EXTRUDE6_DEPTH, both=True, mode=Mode.SUBTRACT)

    # Fillet1
    fillet1_edges = [part.edges().sort_by_distance(p)[0] for p in [
        (0, 3, -1.75),
    ]]
    fillet(fillet1_edges, radius=FILLET1_R)

    # Chamfer2
    chamfer2_edges = [part.edges().sort_by_distance(p)[0] for p in [
        (0, 2, -1.5),
    ]]
    chamfer(chamfer2_edges, length=CHAMFER2_SIZE - 0.0001)  # a hair under: the kernel refuses the full size

    # Fillet2
    fillet2_edges = [part.edges().sort_by_distance(p)[0] for p in [
        (-6.75, 1.75, 5),
        (6.75, 1.5, 5),
        (6.75, 1.75, -5),
        (-6.75, 1.5, -5),
    ]]
    fillet(fillet2_edges, radius=FILLET2_R)


solid = part.part
